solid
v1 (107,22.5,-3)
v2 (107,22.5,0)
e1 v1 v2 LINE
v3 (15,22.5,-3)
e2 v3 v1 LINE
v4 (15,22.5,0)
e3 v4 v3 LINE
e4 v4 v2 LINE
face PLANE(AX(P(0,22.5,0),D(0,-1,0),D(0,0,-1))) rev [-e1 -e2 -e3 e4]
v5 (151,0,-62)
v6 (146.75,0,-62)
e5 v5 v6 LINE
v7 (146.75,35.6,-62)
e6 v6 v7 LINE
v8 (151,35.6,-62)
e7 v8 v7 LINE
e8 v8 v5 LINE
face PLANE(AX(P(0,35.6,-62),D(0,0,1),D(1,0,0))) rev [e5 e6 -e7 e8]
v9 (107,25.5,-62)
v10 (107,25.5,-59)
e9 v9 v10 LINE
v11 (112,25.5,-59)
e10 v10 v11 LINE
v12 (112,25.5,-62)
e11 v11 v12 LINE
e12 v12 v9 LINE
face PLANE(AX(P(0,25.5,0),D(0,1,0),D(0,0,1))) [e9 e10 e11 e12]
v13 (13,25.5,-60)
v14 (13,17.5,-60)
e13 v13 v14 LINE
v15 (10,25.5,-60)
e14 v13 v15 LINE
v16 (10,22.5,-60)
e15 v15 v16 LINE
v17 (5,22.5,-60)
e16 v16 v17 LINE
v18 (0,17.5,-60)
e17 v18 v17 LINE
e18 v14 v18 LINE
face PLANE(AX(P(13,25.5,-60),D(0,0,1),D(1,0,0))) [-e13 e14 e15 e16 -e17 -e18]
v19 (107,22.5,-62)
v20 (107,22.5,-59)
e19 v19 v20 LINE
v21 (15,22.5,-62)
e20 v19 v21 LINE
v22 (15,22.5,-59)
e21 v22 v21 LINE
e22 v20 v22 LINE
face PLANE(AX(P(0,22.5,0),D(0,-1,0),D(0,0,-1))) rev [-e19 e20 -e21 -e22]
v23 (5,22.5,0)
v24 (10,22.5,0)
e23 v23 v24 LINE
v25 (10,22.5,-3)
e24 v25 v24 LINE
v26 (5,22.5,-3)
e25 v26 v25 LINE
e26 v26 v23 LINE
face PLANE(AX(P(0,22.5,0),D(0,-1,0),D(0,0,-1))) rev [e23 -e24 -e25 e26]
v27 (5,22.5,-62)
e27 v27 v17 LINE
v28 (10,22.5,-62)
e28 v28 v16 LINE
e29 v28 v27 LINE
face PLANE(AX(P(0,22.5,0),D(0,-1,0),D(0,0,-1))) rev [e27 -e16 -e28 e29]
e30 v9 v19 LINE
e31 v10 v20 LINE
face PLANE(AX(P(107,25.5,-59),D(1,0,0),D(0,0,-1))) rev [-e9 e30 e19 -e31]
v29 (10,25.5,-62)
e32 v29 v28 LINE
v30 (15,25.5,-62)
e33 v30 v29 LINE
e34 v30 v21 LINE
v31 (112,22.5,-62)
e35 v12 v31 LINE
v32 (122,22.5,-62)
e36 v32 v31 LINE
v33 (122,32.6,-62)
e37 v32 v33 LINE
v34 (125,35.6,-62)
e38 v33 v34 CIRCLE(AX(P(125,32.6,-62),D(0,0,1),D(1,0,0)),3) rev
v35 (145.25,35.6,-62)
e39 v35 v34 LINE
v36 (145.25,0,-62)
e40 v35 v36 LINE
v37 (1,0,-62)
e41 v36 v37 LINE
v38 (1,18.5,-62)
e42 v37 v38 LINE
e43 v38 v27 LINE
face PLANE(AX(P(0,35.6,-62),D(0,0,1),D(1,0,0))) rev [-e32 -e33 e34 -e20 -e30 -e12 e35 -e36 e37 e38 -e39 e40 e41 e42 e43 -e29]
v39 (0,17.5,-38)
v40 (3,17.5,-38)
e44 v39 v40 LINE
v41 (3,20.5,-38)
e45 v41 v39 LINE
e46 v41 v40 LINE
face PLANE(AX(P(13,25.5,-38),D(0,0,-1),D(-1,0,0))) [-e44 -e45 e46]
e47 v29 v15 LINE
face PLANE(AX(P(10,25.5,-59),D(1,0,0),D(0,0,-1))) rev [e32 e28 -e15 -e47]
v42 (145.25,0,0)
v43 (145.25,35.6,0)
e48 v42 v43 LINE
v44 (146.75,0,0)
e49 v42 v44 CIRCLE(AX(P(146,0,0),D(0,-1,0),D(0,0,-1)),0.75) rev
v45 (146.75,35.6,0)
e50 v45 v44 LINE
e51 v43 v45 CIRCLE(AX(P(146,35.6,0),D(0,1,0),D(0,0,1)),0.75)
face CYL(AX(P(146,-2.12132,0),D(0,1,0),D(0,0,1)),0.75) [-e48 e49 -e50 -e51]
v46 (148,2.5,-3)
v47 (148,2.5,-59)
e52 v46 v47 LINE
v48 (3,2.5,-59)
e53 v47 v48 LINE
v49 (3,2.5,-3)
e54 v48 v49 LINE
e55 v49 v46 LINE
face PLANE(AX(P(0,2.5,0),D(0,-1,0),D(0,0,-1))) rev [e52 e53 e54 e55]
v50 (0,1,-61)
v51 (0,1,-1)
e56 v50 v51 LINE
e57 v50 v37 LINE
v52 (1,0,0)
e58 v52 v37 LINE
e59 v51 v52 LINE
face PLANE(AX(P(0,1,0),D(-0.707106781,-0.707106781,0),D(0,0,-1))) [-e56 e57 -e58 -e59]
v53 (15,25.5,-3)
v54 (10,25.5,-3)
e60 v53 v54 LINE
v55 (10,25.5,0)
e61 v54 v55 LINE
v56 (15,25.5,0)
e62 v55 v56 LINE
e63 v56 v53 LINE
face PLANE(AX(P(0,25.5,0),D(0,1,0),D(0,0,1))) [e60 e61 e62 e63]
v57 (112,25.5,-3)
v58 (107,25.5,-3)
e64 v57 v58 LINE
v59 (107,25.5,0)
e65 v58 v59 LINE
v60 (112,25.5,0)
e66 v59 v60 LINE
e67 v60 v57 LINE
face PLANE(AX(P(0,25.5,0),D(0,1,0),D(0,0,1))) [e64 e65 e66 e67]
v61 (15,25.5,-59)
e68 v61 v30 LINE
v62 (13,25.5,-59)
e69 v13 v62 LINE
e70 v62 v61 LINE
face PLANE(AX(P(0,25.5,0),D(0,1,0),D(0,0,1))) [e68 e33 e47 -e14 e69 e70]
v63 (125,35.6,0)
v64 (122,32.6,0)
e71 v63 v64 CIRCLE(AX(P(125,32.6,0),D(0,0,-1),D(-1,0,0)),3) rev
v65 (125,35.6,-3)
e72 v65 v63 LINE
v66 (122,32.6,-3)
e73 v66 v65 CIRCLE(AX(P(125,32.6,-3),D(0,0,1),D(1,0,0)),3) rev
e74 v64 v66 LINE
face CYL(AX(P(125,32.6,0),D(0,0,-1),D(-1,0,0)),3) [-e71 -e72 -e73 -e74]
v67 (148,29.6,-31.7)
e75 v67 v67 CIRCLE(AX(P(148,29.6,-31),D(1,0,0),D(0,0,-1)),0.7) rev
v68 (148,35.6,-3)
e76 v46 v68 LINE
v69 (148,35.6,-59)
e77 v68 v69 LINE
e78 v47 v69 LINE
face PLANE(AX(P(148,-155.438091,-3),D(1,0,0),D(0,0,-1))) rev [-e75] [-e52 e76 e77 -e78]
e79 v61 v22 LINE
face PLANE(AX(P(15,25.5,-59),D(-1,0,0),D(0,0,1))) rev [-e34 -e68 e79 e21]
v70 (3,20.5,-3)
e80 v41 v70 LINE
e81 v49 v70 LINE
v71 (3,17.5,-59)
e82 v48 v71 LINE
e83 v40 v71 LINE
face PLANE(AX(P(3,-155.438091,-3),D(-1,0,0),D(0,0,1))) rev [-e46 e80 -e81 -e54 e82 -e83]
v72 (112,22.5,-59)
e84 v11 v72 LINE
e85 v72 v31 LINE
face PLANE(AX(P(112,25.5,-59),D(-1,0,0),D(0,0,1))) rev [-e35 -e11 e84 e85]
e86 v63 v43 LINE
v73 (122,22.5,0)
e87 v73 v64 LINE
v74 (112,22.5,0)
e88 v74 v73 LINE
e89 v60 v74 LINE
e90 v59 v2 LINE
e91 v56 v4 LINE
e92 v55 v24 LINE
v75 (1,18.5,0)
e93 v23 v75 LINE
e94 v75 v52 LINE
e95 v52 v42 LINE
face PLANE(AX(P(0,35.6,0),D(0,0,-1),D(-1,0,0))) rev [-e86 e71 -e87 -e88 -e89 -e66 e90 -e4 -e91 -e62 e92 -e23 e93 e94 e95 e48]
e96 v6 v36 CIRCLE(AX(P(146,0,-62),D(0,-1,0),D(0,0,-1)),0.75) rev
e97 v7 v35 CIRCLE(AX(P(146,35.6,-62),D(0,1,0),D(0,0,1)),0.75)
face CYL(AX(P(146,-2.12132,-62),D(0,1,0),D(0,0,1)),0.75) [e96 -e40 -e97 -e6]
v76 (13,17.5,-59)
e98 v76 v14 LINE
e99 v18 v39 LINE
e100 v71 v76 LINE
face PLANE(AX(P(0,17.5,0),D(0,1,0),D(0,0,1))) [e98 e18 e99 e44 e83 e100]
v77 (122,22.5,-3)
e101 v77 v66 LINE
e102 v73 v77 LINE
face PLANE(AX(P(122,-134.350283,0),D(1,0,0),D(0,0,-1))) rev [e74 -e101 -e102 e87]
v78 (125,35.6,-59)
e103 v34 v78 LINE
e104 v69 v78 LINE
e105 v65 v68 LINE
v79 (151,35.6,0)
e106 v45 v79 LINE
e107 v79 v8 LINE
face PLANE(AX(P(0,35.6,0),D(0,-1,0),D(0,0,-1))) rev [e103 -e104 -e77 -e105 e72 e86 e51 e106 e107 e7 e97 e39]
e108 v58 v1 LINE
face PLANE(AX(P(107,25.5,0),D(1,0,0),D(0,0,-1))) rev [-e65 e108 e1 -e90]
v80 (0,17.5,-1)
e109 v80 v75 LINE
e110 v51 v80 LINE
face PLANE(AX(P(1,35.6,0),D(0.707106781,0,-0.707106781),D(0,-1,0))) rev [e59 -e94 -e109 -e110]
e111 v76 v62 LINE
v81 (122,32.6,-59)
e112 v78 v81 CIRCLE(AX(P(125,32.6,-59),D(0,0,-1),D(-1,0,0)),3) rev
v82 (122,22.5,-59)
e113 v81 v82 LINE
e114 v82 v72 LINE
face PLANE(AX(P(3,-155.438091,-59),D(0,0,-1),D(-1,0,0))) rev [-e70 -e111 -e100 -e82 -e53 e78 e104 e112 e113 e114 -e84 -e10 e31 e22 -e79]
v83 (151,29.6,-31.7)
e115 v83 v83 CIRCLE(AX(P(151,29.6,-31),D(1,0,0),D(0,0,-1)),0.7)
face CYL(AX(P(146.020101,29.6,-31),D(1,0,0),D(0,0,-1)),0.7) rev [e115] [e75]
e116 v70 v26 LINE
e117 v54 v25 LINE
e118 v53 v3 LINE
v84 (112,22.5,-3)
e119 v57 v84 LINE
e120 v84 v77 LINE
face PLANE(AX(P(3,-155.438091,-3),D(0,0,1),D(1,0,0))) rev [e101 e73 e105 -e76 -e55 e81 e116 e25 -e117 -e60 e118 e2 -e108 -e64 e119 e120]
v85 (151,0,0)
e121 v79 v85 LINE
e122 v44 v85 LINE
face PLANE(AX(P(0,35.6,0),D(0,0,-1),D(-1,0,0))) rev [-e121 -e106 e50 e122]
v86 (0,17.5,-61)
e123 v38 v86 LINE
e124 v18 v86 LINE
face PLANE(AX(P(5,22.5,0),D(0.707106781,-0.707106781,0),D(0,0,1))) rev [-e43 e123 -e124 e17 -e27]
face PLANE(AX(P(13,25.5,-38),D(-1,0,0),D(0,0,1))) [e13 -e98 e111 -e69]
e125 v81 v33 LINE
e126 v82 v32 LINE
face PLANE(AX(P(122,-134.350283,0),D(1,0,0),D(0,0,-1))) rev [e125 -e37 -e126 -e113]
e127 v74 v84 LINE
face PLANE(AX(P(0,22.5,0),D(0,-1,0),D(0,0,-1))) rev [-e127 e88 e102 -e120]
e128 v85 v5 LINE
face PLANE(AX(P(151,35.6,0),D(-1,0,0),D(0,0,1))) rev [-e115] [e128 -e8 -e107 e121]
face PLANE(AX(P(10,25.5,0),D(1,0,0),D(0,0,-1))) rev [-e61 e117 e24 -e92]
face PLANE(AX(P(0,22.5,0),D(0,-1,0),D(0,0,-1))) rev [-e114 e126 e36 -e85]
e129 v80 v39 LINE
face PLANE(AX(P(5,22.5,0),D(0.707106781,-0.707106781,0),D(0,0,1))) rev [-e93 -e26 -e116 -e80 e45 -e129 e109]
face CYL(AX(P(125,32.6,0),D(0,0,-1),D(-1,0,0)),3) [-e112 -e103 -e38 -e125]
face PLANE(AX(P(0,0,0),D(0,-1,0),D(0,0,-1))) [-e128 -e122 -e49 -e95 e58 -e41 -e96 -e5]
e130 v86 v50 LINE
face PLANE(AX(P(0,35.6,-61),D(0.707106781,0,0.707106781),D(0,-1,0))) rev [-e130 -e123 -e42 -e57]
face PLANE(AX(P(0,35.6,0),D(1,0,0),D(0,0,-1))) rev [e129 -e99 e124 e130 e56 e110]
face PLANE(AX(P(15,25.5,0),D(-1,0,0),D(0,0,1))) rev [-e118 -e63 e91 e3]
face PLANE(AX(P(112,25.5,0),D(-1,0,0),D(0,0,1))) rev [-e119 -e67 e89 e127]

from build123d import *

# Parameters (mm, degrees)
ESBO_O1_W                  = 151
ESBO_O1_H                  = 62
RESSALTO_EXTRUS_O1_DEPTH   = 35.6
ESBO_O2_W                  = 145
ESBO_O2_H                  = 56
CORTE_EXTRUS_O1_DEPTH      = 33.1
ESBO_O3_W                  = 122
ESBO_O3_H                  = 62
CORTE_EXTRUS_O2_DEPTH      = 13.1
CHANFRO1_SIZE              = 5
ESBO_O7_R                  = 0.7
CORTE_EXTRUS_O6_DEPTH      = 3
ESBO_O6_R                  = 0.75
RESSALTO_EXTRUS_O2_DEPTH   = 35.6
FILETE1_R                  = 3
CHANFRO2_SIZE              = 1
ESBO_O8_W                  = 5
ESBO_O8_H                  = 3
RESSALTO_EXTRUS_O3_DEPTH   = 3
CORTE_EXTRUS_O7_DEPTH      = 3
CORTE_EXTRUS_O7_DEPTH_BACK = 5
ESBO_O9_W                  = 13
ESBO_O9_H                  = 22


with BuildPart() as part:
    # Esboço1 → Ressalto-extrusão1 (new body)
    with BuildSketch(Plane(origin=(0, 0, 0), x_dir=(1, 0, 0), z_dir=(0, 1, 0))):
        with Locations((75.5, 31)):
            Rectangle(ESBO_O1_W, ESBO_O1_H)
    extrude(amount=RESSALTO_EXTRUS_O1_DEPTH)

    # Esboço2 → Corte-extrusão1 (cut)
    with BuildSketch(Plane(origin=(0, 35.6, 0), x_dir=(1, 0, 0), z_dir=(0, 1, 0))):
        with Locations((75.5, 31)):
            Rectangle(ESBO_O2_W, ESBO_O2_H)
    extrude(amount=-CORTE_EXTRUS_O1_DEPTH, mode=Mode.SUBTRACT)

    # Esboço3 → Corte-extrusão2 (cut)
    with BuildSketch(Plane(origin=(0, 35.6, 0), x_dir=(1, 0, 0), z_dir=(0, 1, 0))):
        with Locations((61, 31)):
            Rectangle(ESBO_O3_W, ESBO_O3_H)
    extrude(amount=-CORTE_EXTRUS_O2_DEPTH, mode=Mode.SUBTRACT)

    # Chanfro1
    # the kernel refuses this chamfer: 5 mm, written as the material it takes off along each edge
    with BuildSketch(Plane(origin=(0, 22.5, -74.85841494), x_dir=(0.9996219169112968, 0.027495876610586317, 0), z_dir=(0, 0, 1))) as chanfro1_piece_1:
        Polygon((CHANFRO1_SIZE * 0.999621916911, -CHANFRO1_SIZE * 0.0274958766106), (-CHANFRO1_SIZE * 0.0274958766106, -CHANFRO1_SIZE * 0.999621916911), (0, 0), align=None)
    extrude(amount=87.71682988, mode=Mode.SUBTRACT)

    # Esboço7 → Corte-extrusão6 (cut)
    with BuildSketch(Plane(origin=(151, 0, 0), x_dir=(0, 0, -1), z_dir=(1, 0, 0))):
        with Locations((31, 29.6)):
            Circle(ESBO_O7_R)
    extrude(amount=-CORTE_EXTRUS_O6_DEPTH, mode=Mode.SUBTRACT)

    # Esboço6 → Ressalto-extrusão2 (add)
    with BuildSketch(Plane(origin=(0, 35.6, 0), x_dir=(1, 0, 0), z_dir=(0, 1, 0))):
        with Locations((146, 62)):
            Circle(ESBO_O6_R)
        with Locations((146, 0)):
            Circle(ESBO_O6_R)
    extrude(amount=-RESSALTO_EXTRUS_O2_DEPTH)

    # Filete1
    filete1_edges = [part.edges().sort_by_distance(p)[0] for p in [
        (122, 35.6, -60.5),
        (122, 35.6, -1.5),
    ]]
    fillet(filete1_edges, radius=FILETE1_R)

    # Chanfro2
    chanfro2_edges = [part.edges().sort_by_distance(p)[0] for p in [
        (0, 8.75, 0),
        (0, 8.75, -62),
        (0, 0, -31),
    ]]
    chamfer(chanfro2_edges, length=CHANFRO2_SIZE)

    # Esboço8 → Ressalto-extrusão3 (add)
    with BuildSketch(Plane(origin=(0, 22.5, 0), x_dir=(1, 0, 0), z_dir=(0, 1, 0))):
        with Locations((12.5, 60.5)):
            Rectangle(ESBO_O8_W, ESBO_O8_H)
        with Locations((12.5, 1.5)):
            Rectangle(ESBO_O8_W, ESBO_O8_H)
        with Locations((109.5, 60.5)):
            Rectangle(ESBO_O8_W, ESBO_O8_H)
        with Locations((109.5, 1.5)):
            Rectangle(ESBO_O8_W, ESBO_O8_H)
    extrude(amount=RESSALTO_EXTRUS_O3_DEPTH)

    # Esboço9 → Corte-extrusão7 (cut, two sides: drawn at the far end of the back side and taken through both)
    with BuildSketch(Plane(origin=(0, 22.5, 0), x_dir=(1, 0, 0), z_dir=(0, 1, 0)).offset(-CORTE_EXTRUS_O7_DEPTH_BACK)):
        with Locations((6.5, 49)):
            Rectangle(ESBO_O9_W, ESBO_O9_H)
    extrude(amount=CORTE_EXTRUS_O7_DEPTH + CORTE_EXTRUS_O7_DEPTH_BACK, mode=Mode.SUBTRACT)


solid = part.part
